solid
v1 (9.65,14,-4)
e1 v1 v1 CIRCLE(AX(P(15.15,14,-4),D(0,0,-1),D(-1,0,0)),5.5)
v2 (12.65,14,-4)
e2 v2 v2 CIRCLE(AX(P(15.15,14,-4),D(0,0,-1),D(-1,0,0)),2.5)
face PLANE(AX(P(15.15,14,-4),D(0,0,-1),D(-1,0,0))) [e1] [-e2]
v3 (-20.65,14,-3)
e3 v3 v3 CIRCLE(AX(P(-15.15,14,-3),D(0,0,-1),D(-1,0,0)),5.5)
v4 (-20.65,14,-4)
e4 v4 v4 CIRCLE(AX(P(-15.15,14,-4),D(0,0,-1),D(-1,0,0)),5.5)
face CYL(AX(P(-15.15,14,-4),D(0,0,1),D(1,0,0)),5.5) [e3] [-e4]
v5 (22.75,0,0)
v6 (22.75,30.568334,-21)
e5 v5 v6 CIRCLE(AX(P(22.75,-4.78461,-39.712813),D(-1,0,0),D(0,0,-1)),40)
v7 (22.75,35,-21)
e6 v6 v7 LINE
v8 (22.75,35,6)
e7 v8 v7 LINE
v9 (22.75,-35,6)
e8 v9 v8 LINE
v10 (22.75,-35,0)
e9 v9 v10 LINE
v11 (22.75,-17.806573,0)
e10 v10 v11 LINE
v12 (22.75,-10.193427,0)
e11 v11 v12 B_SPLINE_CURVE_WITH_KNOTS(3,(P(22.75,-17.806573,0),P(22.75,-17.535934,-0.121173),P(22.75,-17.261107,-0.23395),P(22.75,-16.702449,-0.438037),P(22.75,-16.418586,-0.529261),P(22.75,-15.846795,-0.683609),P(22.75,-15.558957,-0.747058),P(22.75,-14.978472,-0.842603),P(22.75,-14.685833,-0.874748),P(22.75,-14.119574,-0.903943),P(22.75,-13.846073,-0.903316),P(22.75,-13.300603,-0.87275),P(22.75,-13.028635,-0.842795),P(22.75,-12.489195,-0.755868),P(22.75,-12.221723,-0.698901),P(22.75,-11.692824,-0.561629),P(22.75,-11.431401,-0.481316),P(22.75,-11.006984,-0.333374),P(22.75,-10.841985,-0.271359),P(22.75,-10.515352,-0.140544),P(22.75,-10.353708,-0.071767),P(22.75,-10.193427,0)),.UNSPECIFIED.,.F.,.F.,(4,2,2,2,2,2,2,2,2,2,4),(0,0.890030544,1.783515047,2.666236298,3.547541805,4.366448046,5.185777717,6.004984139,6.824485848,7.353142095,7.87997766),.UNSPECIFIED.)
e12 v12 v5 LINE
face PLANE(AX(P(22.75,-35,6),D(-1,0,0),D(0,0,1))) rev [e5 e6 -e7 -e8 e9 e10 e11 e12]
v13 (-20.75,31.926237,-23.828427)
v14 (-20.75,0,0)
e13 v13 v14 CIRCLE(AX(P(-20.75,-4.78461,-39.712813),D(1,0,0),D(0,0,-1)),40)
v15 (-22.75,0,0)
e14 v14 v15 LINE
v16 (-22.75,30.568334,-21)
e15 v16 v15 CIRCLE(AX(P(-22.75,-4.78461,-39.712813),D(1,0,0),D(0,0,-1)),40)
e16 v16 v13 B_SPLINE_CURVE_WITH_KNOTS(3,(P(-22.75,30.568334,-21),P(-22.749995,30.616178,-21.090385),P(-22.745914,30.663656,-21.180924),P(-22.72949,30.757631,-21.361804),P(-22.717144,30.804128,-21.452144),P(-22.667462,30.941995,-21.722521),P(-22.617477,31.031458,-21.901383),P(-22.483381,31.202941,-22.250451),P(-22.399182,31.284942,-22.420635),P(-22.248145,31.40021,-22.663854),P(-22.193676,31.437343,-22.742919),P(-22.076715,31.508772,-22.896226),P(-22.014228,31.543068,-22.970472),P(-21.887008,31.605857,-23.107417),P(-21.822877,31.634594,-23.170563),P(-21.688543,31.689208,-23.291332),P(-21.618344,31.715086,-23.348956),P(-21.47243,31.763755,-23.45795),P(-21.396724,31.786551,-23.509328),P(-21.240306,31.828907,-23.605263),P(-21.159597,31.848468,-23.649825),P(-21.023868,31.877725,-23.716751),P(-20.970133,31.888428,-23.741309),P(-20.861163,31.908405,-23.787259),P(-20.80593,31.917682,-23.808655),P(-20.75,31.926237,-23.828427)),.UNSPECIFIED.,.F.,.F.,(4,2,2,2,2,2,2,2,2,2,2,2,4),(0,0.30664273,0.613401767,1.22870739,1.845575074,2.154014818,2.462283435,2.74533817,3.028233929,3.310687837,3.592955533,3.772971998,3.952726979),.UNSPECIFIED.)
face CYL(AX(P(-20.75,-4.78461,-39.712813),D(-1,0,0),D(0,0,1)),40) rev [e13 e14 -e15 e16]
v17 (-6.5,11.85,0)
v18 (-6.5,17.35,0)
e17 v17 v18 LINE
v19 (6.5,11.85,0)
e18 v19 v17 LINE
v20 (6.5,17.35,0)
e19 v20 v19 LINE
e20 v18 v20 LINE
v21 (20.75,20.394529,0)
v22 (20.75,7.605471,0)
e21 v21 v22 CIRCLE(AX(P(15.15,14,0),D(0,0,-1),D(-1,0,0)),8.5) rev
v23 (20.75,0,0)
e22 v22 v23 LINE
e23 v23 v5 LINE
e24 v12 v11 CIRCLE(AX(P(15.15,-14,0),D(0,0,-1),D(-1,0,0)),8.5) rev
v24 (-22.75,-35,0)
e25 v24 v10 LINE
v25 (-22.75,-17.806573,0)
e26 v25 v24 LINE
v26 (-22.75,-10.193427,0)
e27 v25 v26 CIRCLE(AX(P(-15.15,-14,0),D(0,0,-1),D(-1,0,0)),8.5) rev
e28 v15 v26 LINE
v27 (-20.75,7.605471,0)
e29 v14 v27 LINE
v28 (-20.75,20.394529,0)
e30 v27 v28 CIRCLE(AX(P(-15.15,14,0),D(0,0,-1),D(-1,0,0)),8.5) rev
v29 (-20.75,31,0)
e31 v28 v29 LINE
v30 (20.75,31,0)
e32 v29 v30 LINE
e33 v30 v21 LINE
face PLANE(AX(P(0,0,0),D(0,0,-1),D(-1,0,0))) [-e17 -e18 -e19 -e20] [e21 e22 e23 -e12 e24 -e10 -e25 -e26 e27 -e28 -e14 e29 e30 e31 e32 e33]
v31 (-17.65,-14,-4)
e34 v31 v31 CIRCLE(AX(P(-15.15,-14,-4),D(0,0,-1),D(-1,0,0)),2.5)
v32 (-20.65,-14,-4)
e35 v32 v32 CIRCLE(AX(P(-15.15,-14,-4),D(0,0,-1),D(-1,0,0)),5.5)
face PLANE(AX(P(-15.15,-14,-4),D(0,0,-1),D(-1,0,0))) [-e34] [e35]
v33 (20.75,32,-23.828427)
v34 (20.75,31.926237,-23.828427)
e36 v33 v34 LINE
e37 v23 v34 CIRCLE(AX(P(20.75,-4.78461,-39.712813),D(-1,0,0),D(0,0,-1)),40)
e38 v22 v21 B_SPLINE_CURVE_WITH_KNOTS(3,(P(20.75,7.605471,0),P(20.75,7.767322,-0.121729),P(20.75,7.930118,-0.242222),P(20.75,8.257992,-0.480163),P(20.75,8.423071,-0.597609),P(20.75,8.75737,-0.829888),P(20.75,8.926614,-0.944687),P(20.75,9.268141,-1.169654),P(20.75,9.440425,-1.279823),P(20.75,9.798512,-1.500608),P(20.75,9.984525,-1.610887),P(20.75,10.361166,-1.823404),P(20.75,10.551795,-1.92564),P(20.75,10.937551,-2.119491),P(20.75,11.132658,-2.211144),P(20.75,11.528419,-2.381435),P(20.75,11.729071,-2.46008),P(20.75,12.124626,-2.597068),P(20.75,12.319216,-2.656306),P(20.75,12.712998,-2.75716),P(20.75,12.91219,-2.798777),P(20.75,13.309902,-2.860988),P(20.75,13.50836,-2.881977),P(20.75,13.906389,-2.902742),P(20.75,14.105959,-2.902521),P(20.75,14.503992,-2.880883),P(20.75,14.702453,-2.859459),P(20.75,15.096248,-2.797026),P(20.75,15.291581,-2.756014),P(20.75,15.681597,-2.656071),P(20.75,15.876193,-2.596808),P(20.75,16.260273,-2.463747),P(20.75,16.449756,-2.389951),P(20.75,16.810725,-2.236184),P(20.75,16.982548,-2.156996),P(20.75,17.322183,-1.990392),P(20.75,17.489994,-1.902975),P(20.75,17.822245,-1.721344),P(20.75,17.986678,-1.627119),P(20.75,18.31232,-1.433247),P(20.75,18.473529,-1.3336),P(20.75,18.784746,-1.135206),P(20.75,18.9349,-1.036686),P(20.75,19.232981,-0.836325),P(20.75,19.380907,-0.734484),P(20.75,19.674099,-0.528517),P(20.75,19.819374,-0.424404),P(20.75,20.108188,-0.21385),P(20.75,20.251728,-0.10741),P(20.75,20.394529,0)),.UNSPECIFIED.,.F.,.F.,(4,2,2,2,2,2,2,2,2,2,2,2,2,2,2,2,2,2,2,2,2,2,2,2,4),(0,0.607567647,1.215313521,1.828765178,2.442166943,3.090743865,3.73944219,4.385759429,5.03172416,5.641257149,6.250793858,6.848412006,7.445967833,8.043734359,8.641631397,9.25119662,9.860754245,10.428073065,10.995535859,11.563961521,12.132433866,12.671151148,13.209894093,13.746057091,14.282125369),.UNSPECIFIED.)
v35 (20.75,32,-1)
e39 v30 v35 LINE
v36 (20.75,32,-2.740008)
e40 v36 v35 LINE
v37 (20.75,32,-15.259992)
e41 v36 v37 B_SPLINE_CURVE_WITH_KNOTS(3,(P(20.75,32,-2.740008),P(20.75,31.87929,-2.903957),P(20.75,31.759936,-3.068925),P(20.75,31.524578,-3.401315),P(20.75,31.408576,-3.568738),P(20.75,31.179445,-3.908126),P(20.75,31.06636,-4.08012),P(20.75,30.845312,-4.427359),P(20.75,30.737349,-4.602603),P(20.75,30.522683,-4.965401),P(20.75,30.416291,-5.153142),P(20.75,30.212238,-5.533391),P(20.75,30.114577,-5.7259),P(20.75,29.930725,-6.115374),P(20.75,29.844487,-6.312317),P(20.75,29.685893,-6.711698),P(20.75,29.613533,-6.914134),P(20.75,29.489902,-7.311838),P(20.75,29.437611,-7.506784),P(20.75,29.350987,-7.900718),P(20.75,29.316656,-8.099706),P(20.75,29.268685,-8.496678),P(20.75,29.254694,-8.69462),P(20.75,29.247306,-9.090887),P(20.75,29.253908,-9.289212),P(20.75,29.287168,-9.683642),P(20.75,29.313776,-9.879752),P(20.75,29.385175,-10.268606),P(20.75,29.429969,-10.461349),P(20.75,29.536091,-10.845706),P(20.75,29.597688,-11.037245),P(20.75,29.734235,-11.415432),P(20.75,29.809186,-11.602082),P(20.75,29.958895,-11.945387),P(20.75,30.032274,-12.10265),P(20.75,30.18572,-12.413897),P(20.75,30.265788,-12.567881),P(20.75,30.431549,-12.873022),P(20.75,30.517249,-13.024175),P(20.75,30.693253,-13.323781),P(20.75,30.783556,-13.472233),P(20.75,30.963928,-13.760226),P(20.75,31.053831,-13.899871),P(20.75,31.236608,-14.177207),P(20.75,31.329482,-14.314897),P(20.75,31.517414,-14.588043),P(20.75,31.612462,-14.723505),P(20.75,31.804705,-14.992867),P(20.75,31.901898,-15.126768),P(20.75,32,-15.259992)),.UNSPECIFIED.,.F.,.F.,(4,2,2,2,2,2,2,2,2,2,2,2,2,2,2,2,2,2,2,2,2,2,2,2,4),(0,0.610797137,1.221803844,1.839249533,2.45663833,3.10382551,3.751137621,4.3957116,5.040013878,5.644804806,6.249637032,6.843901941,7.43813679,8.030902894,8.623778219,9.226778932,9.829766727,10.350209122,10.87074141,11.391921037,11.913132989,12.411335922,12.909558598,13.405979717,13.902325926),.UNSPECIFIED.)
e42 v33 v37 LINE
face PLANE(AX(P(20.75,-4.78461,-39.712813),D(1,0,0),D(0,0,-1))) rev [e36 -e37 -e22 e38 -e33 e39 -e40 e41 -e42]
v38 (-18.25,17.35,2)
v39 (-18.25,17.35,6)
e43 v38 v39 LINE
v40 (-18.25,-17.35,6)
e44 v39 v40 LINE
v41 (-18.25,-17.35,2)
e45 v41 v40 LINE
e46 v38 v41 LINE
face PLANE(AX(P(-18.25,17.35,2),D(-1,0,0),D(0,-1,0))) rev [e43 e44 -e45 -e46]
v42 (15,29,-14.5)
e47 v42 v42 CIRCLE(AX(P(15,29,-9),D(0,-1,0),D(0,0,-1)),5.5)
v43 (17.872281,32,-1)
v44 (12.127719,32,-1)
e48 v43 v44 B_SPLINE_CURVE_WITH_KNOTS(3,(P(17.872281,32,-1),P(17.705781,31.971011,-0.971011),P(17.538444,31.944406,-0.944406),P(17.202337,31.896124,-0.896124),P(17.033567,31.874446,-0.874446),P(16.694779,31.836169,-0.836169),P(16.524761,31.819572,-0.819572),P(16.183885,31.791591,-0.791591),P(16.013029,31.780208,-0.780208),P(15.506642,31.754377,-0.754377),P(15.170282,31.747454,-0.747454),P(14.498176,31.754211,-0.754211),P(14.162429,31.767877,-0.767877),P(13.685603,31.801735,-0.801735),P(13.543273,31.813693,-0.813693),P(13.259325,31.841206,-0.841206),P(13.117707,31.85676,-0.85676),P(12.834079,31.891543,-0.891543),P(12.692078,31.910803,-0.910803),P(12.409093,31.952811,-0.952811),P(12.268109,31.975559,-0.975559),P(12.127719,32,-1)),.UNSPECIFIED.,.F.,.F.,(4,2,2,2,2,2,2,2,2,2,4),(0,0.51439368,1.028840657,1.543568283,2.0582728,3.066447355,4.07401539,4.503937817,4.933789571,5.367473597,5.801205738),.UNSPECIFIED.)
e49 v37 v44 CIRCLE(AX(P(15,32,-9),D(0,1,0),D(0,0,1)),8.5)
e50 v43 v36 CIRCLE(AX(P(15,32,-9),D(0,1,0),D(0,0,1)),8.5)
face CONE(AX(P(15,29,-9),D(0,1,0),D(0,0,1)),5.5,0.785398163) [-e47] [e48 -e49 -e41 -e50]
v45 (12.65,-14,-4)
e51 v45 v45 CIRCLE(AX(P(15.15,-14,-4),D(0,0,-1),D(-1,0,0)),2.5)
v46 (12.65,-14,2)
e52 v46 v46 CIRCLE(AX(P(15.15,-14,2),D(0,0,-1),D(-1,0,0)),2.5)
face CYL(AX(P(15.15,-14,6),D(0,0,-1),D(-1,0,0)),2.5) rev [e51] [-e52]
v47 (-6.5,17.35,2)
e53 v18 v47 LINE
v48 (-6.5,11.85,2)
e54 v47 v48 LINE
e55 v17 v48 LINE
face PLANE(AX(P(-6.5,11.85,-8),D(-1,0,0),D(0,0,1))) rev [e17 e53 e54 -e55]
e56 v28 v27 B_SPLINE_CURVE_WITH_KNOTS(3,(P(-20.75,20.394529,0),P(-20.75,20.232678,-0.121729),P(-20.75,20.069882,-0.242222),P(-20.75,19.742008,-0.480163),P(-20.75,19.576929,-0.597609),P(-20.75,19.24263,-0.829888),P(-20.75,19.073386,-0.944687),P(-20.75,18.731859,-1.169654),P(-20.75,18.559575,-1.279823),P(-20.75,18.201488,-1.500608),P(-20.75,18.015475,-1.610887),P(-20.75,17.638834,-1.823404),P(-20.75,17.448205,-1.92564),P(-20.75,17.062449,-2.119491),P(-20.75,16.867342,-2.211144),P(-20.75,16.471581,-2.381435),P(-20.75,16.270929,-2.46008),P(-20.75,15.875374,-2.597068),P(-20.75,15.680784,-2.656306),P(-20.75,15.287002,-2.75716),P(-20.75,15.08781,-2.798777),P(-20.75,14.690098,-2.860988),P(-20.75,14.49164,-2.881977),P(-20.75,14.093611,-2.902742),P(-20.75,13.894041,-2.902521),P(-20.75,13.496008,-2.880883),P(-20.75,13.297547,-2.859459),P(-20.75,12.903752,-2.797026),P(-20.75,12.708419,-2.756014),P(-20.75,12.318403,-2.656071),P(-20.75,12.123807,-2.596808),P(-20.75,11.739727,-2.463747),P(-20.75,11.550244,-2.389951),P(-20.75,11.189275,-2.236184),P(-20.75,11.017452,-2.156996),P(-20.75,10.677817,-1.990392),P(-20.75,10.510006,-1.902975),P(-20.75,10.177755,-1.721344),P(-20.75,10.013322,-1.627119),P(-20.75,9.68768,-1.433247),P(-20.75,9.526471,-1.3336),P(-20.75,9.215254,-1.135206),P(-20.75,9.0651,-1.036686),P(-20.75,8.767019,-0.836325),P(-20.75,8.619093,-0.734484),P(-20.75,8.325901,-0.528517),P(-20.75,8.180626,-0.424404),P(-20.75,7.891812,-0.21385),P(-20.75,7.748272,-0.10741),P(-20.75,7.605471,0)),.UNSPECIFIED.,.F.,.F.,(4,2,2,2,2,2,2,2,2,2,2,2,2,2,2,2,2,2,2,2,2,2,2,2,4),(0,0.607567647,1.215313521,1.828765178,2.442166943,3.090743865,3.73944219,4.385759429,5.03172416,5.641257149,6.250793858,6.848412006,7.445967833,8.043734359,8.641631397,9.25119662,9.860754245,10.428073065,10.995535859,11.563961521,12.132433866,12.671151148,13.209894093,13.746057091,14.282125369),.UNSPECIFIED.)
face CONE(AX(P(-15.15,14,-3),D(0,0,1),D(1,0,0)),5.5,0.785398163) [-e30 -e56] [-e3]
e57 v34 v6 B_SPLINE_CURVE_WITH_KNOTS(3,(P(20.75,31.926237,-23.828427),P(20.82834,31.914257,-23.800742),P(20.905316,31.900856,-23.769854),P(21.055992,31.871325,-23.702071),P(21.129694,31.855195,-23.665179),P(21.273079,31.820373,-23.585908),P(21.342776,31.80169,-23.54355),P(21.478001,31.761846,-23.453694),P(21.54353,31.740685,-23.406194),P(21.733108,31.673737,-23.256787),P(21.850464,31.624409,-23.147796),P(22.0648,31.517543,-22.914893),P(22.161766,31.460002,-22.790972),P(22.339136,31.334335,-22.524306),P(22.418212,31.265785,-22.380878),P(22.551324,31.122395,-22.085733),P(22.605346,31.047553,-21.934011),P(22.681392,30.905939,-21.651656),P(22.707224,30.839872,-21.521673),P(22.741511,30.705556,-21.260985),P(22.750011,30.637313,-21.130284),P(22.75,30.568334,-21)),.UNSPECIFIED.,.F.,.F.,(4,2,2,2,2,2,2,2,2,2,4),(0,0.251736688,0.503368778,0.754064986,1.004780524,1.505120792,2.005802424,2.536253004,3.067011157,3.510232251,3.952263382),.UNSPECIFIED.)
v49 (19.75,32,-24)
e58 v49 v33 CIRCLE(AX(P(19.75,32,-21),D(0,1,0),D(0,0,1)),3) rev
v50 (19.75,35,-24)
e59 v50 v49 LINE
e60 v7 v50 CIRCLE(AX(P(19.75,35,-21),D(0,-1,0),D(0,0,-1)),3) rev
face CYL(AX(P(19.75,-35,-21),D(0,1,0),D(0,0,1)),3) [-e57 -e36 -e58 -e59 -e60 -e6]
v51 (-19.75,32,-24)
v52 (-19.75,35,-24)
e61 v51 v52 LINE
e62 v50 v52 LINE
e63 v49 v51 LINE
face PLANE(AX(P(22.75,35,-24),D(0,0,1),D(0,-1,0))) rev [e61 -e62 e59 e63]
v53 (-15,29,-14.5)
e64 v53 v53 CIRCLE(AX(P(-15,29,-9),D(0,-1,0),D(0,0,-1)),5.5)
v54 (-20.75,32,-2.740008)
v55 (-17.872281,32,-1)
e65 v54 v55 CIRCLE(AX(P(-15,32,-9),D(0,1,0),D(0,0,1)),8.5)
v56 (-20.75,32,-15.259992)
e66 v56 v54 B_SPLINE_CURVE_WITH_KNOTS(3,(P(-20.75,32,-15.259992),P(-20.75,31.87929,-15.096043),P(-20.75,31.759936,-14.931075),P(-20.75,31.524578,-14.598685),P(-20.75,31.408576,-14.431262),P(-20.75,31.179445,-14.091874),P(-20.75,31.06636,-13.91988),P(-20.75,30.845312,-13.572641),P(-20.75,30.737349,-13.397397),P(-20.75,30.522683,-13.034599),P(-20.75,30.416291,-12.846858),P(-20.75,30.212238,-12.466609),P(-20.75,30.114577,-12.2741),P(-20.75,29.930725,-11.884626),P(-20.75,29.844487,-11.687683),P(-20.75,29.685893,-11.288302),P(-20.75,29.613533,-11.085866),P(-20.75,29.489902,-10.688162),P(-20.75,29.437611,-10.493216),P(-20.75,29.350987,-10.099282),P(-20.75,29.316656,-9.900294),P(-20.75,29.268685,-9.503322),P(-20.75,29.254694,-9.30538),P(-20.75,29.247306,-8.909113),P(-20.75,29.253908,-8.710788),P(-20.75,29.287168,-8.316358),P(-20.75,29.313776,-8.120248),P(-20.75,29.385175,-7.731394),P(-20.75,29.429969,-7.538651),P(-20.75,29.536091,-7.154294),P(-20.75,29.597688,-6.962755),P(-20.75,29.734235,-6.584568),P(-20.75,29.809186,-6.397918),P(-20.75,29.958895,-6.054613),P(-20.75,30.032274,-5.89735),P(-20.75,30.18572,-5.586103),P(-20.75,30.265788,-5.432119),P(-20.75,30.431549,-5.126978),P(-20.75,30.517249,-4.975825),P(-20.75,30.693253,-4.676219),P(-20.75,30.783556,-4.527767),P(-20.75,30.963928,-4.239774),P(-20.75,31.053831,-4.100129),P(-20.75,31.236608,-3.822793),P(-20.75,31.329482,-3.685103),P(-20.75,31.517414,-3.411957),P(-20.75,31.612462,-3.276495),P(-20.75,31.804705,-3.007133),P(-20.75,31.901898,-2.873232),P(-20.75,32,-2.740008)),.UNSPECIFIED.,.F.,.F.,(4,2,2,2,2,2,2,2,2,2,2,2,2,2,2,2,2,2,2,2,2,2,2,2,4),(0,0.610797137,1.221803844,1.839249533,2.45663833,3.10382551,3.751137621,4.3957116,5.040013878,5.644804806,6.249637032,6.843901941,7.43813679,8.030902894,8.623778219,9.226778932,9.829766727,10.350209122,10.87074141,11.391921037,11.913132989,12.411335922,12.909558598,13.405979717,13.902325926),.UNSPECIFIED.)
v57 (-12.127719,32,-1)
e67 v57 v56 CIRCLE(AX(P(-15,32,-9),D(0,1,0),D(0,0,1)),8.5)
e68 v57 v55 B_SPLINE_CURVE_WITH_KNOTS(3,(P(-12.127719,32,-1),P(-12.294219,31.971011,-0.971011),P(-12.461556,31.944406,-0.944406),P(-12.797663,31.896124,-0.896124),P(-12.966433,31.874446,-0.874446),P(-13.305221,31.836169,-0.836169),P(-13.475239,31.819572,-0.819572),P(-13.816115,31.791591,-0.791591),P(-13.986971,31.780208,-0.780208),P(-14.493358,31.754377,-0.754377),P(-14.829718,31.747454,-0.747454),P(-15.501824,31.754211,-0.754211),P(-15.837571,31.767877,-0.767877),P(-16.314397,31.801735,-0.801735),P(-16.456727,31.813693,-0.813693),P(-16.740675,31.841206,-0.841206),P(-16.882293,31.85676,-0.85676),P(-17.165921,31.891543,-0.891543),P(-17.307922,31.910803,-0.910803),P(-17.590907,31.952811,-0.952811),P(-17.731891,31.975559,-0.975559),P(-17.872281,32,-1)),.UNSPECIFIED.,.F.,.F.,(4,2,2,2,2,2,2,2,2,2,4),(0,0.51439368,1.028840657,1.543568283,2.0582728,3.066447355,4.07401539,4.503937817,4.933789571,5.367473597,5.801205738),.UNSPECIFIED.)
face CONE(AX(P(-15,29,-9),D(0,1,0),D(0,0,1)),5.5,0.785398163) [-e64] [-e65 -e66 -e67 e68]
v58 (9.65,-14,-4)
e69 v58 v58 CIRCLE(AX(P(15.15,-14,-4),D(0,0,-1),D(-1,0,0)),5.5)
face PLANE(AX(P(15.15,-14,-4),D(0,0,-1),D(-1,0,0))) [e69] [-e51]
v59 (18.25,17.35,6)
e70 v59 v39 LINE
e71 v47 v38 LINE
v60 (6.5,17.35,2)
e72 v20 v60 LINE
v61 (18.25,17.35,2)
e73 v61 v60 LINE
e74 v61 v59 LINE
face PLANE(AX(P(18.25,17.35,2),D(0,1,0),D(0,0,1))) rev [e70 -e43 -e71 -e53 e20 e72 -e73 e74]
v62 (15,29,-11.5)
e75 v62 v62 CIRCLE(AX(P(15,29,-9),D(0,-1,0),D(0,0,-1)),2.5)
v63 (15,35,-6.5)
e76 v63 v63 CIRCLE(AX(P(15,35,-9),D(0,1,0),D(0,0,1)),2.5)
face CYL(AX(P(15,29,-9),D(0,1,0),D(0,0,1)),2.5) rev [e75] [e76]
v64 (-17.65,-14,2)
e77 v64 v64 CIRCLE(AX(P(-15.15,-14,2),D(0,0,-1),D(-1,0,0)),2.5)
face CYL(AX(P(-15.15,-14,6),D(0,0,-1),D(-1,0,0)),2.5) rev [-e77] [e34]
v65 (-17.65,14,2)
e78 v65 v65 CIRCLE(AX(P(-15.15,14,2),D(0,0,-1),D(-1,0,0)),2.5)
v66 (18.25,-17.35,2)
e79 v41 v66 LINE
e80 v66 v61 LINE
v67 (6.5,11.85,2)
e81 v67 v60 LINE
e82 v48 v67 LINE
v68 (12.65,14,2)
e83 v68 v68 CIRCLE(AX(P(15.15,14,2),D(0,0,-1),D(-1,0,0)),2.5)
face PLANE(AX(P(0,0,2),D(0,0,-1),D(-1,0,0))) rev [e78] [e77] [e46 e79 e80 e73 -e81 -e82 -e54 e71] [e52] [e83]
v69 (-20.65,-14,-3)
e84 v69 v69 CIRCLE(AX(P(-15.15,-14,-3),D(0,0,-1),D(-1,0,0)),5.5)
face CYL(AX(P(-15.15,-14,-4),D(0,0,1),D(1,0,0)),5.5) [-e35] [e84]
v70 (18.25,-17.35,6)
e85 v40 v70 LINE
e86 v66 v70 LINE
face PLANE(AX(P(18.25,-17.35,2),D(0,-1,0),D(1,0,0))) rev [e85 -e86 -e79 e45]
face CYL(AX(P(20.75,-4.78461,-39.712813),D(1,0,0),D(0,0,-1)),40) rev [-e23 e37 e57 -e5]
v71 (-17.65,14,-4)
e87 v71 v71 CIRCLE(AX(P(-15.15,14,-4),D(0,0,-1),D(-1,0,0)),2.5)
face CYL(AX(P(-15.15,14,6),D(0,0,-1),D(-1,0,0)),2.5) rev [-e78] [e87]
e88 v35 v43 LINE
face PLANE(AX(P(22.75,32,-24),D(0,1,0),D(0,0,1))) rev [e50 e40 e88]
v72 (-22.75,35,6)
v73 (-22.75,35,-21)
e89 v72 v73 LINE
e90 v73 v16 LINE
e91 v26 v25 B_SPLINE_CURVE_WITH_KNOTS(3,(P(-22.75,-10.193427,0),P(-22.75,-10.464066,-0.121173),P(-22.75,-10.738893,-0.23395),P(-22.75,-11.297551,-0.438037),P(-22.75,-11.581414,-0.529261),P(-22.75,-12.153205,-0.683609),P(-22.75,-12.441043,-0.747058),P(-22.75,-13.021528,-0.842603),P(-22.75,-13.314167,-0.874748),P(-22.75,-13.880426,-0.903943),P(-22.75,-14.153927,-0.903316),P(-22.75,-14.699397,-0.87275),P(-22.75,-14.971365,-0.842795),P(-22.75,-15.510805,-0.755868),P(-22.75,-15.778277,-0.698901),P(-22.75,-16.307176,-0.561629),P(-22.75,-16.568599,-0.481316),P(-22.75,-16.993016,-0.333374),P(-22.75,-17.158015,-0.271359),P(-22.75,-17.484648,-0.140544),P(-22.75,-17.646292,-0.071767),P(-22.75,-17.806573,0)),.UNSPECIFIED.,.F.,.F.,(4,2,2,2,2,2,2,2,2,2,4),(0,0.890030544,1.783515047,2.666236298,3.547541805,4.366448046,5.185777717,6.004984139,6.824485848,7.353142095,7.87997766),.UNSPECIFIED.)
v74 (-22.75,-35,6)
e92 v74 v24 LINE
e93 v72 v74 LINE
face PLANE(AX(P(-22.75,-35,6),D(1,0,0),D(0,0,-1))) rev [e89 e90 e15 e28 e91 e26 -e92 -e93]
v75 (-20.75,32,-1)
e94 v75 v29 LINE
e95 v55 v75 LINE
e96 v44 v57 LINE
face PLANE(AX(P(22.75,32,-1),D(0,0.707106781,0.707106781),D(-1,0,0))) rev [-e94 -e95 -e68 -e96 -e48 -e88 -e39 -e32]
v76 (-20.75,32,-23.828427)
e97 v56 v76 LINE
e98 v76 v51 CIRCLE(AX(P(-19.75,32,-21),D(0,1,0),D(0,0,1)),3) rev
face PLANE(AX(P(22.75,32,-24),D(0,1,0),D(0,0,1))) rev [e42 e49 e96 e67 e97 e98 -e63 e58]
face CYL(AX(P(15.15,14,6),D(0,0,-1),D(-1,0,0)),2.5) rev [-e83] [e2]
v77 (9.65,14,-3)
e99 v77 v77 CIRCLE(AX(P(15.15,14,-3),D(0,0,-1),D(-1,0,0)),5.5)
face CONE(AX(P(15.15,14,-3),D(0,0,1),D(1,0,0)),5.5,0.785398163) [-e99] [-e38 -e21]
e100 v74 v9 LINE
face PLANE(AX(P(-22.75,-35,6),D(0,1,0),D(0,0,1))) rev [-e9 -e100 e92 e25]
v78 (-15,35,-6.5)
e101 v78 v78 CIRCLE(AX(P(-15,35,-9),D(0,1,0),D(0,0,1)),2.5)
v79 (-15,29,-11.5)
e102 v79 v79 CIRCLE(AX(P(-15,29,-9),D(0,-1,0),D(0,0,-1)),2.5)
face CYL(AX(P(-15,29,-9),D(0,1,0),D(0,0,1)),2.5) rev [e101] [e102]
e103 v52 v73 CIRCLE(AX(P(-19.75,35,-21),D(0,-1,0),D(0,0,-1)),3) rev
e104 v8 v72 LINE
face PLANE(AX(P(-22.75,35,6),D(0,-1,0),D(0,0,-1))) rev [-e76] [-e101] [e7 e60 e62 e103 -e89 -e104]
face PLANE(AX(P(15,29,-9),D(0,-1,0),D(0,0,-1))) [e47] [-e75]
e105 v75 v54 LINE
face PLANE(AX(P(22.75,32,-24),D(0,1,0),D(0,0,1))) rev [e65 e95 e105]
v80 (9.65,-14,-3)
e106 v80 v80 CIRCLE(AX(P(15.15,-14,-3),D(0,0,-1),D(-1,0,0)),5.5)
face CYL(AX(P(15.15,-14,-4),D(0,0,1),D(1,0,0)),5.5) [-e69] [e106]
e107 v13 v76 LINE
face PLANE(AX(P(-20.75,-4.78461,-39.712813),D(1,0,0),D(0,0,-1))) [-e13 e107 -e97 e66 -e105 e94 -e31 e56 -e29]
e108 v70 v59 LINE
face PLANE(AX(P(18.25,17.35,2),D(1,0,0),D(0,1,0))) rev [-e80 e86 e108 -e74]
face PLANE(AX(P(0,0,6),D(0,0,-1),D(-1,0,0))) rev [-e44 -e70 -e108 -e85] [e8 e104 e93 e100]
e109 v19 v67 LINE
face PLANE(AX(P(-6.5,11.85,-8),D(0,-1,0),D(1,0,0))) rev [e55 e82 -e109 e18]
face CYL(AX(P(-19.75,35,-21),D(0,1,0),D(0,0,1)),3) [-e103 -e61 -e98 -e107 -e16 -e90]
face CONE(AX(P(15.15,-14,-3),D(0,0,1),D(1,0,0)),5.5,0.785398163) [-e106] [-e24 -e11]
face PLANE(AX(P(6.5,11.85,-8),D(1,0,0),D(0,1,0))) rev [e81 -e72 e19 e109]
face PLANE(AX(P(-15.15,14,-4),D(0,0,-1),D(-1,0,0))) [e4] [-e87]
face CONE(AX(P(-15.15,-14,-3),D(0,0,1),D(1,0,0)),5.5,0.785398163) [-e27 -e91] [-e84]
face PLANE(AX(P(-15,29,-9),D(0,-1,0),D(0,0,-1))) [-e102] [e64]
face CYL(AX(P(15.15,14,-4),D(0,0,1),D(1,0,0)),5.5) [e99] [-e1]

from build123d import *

# Parameters (mm, degrees)
SKETCH1_W                = 45.5
SKETCH1_H                = 70
SKETCH1_R                = 2.5
BOSS_EXTRUDE1_DEPTH      = 6
SKETCH2_W                = 36.5
SKETCH2_H                = 34.7
CUT_EXTRUDE1_DEPTH       = 4
BOSS_EXTRUDE2_DEPTH      = 22.75
BOSS_EXTRUDE2_DEPTH_BACK = 22.75
SKETCH3_W                = 24
SKETCH3_H                = 3
BOSS_EXTRUDE3_DEPTH      = 2
BOSS_EXTRUDE4_START      = -2
BOSS_EXTRUDE4_DEPTH      = 2
SKETCH6_R                = 2.5
CUT_EXTRUDE2_DEPTH       = 6
FILLET1_R                = 3
SKETCH7_R                = 5.5
SKETCH7_R_2              = 2.5
BOSS_EXTRUDE5_DEPTH      = 3
BOSS_EXTRUDE6_START      = 4
SKETCH8_R                = 5.5
SKETCH8_R_2              = 2.5
BOSS_EXTRUDE6_DEPTH      = 4
CHAMFER1_SIZE            = 3
SKETCH10_W               = 13
SKETCH10_H               = 5.5
CUT_EXTRUDE3_DEPTH       = 10
CHAMFER3_SIZE            = 1


with BuildPart() as part:
    # Sketch1 → Boss-Extrude1 (new body)
    with BuildSketch(Plane.XY):
        Rectangle(SKETCH1_W, SKETCH1_H)
        with Locations((-15.15, 14)):
            Circle(SKETCH1_R, mode=Mode.SUBTRACT)
        with Locations((15.15, 14)):
            Circle(SKETCH1_R, mode=Mode.SUBTRACT)
        with Locations((15.15, -14)):
            Circle(SKETCH1_R, mode=Mode.SUBTRACT)
        with Locations((-15.15, -14)):
            Circle(SKETCH1_R, mode=Mode.SUBTRACT)
    extrude(amount=BOSS_EXTRUDE1_DEPTH)

    # Sketch2 → Cut-Extrude1 (cut)
    with BuildSketch(Plane.XY.offset(6)):
        Rectangle(SKETCH2_W, SKETCH2_H)
    extrude(amount=-CUT_EXTRUDE1_DEPTH, mode=Mode.SUBTRACT)

    # Sketch3 → Boss-Extrude2 (add, two sides: drawn at the far end of the back side and taken through both)
    with BuildSketch(Plane(origin=(0, 0, 0), x_dir=(0, 0, -1), z_dir=(1, 0, 0)).offset(-BOSS_EXTRUDE2_DEPTH_BACK)):
        with Locations((12, 33.5)):
            Rectangle(SKETCH3_W, SKETCH3_H)
    extrude(amount=BOSS_EXTRUDE2_DEPTH + BOSS_EXTRUDE2_DEPTH_BACK)

    # Sketch4 → Boss-Extrude3 (add)
    with BuildSketch(Plane.ZY.offset(22.75)):
        with BuildLine():
            Line((-24, 32), (0, 32))
            Line((0, 32), (0, 0))
            ThreePointArc((0, 0), (-7.712812921, 19.215390309), (-24, 32))
        make_face()
    extrude(amount=-BOSS_EXTRUDE3_DEPTH)

    # Sketch5 → Boss-Extrude4 (add)
    with BuildSketch(Plane(origin=(22.75, 0, 0), x_dir=(0, 0, -1), z_dir=(1, 0, 0)).offset(BOSS_EXTRUDE4_START)):
        with BuildLine():
            Line((24, 32), (0, 32))
            Line((0, 32), (0, 0))
            ThreePointArc((0, 0), (7.712812921, 19.215390309), (24, 32))
        make_face()
    extrude(amount=BOSS_EXTRUDE4_DEPTH)

    # Sketch6 → Cut-Extrude2 (cut)
    with BuildSketch(Plane(origin=(0, 35, 0), x_dir=(1, 0, 0), z_dir=(0, 1, 0))):
        with Locations(Location((-15, 9, 0), (0, 0, 270))):
            Circle(SKETCH6_R)
        with Locations(Location((15, 9, 0), (0, 0, 270))):
            Circle(SKETCH6_R)
    extrude(amount=-CUT_EXTRUDE2_DEPTH, mode=Mode.SUBTRACT)

    # Fillet1
    # the kernel refuses this fillet: 3 mm, written as the material it takes off along each edge
    with BuildSketch(Plane(origin=(-22.75, 42.5, -24), x_dir=(0, 0, 1), z_dir=(0, -1, 0))) as fillet1_piece_1:
        with BuildLine():
            CenterArc((FILLET1_R, -FILLET1_R), FILLET1_R, 90, 90)
            Line((0, -FILLET1_R), (0, 0))
            Line((0, 0), (FILLET1_R, 0))
        make_face()
    extrude(amount=18, mode=Mode.SUBTRACT)
    with BuildSketch(Plane(origin=(22.75, 42.5, -24), x_dir=(0, 0, 1), z_dir=(0, -1, 0))) as fillet1_piece_2:
        with BuildLine():
            CenterArc((FILLET1_R, FILLET1_R), FILLET1_R, 180, 90)
            Line((0, FILLET1_R), (0, 0))
            Line((0, 0), (FILLET1_R, 0))
        make_face()
    extrude(amount=18, mode=Mode.SUBTRACT)

    # Sketch7 → Boss-Extrude5 (add)
    # profile 1 of 2: a face of its own
    with BuildSketch(Plane.XZ.offset(-32)):
        with Locations(Location((-15, -9, 0), (0, 0, 90))):
            Circle(SKETCH7_R)
        with Locations(Location((-15, -9, 0), (0, 0, 90))):
            Circle(SKETCH7_R_2, mode=Mode.SUBTRACT)
    # profile 2 of 2: a face of its own
    with BuildSketch(Plane.XZ.offset(-32)):
        with Locations(Location((15, -9, 0), (0, 0, 90))):
            Circle(SKETCH7_R)
        with Locations(Location((15, -9, 0), (0, 0, 90))):
            Circle(SKETCH7_R_2, mode=Mode.SUBTRACT)
    extrude(amount=BOSS_EXTRUDE5_DEPTH)

    # Sketch8 → Boss-Extrude6 (add)
    # profile 1 of 4: a face of its own
    with BuildSketch(Plane(origin=(0, 0, 0), x_dir=(-1, 0, 0), z_dir=(0, 0, -1)).offset(BOSS_EXTRUDE6_START)):
        with Locations((-15.15, 14)):
            Circle(SKETCH8_R)
        with Locations((-15.15, 14)):
            Circle(SKETCH8_R_2, mode=Mode.SUBTRACT)
    # profile 2 of 4: a face of its own
    with BuildSketch(Plane(origin=(0, 0, 0), x_dir=(-1, 0, 0), z_dir=(0, 0, -1)).offset(BOSS_EXTRUDE6_START)):
        with Locations((15.15, 14)):
            Circle(SKETCH8_R)
        with Locations((15.15, 14)):
            Circle(SKETCH8_R_2, mode=Mode.SUBTRACT)
    # profile 3 of 4: a face of its own
    with BuildSketch(Plane(origin=(0, 0, 0), x_dir=(-1, 0, 0), z_dir=(0, 0, -1)).offset(BOSS_EXTRUDE6_START)):
        with Locations((15.15, -14)):
            Circle(SKETCH8_R)
        with Locations((15.15, -14)):
            Circle(SKETCH8_R_2, mode=Mode.SUBTRACT)
    # profile 4 of 4: a face of its own
    with BuildSketch(Plane(origin=(0, 0, 0), x_dir=(-1, 0, 0), z_dir=(0, 0, -1)).offset(BOSS_EXTRUDE6_START)):
        with Locations((-15.15, -14)):
            Circle(SKETCH8_R)
        with Locations((-15.15, -14)):
            Circle(SKETCH8_R_2, mode=Mode.SUBTRACT)
    extrude(amount=-BOSS_EXTRUDE6_DEPTH)

    # Chamfer1
    # the kernel refuses this chamfer: 3 mm, written as the material it adds along each edge
    with BuildSketch(Plane(origin=(15, 32, -9), x_dir=(0, 0, 1), z_dir=(1, 0, 0))) as chamfer1_piece_1_section:
        Polygon((5.5 + CHAMFER1_SIZE, 0), (5.5, CHAMFER1_SIZE), (5.5, 0), align=None)
    chamfer1_piece_1 = revolve(axis=Axis((15, 32, -9), (0, -1, 0)), mode=Mode.PRIVATE)
    chamfer1_piece_1 = split(chamfer1_piece_1, bisect_by=Plane(origin=(20.75, 30.538271309, -15.961728691), z_dir=(-1, 0, 0)), keep=Keep.TOP, mode=Mode.PRIVATE)
    add(chamfer1_piece_1)
    with BuildSketch(Plane(origin=(-15, 32, -9), x_dir=(0, 0, 1), z_dir=(1, 0, 0))) as chamfer1_piece_2_section:
        Polygon((5.5 + CHAMFER1_SIZE, 0), (5.5, CHAMFER1_SIZE), (5.5, 0), align=None)
    chamfer1_piece_2 = revolve(axis=Axis((-15, 32, -9), (0, -1, 0)), mode=Mode.PRIVATE)
    chamfer1_piece_2 = split(chamfer1_piece_2, bisect_by=Plane(origin=(-20.75, 30.538271309, -15.961728691), z_dir=(1, 0, 0)), keep=Keep.TOP, mode=Mode.PRIVATE)
    add(chamfer1_piece_2)
    with BuildSketch(Plane(origin=(15.15, -14, 0), x_dir=(-1, 0, 0), z_dir=(0, -1, 0))) as chamfer1_piece_3_section:
        Polygon((5.5 + CHAMFER1_SIZE, 0), (5.5, CHAMFER1_SIZE), (5.5, 0), align=None)
    chamfer1_piece_3 = revolve(axis=Axis((15.15, -14, 0), (0, 0, -1)), mode=Mode.PRIVATE)
    chamfer1_piece_3 = split(chamfer1_piece_3, bisect_by=Plane(origin=(22.75, -14, -1.459917712), z_dir=(-1, 0, 0)), keep=Keep.TOP, mode=Mode.PRIVATE)
    add(chamfer1_piece_3)
    with BuildSketch(Plane(origin=(-15.15, -14, 0), x_dir=(-1, 0, 0), z_dir=(0, -1, 0))) as chamfer1_piece_4_section:
        Polygon((5.5 + CHAMFER1_SIZE, 0), (5.5, CHAMFER1_SIZE), (5.5, 0), align=None)
    chamfer1_piece_4 = revolve(axis=Axis((-15.15, -14, 0), (0, 0, -1)), mode=Mode.PRIVATE)
    chamfer1_piece_4 = split(chamfer1_piece_4, bisect_by=Plane(origin=(-22.75, -14, -1.459917712), z_dir=(1, 0, 0)), keep=Keep.TOP, mode=Mode.PRIVATE)
    add(chamfer1_piece_4)
    with BuildSketch(Plane(origin=(-15.15, 14, 0), x_dir=(-1, 0, 0), z_dir=(0, -1, 0))) as chamfer1_piece_5_section:
        Polygon((5.5 + CHAMFER1_SIZE, 0), (5.5, CHAMFER1_SIZE), (5.5, 0), align=None)
    chamfer1_piece_5 = revolve(axis=Axis((-15.15, 14, 0), (0, 0, -1)), mode=Mode.PRIVATE)
    chamfer1_piece_5 = split(chamfer1_piece_5, bisect_by=Plane(origin=(-20.75, 14, -1.462006574), z_dir=(1, 0, 0)), keep=Keep.TOP, mode=Mode.PRIVATE)
    add(chamfer1_piece_5)
    with BuildSketch(Plane(origin=(15.15, 14, 0), x_dir=(-1, 0, 0), z_dir=(0, -1, 0))) as chamfer1_piece_6_section:
        Polygon((5.5 + CHAMFER1_SIZE, 0), (5.5, CHAMFER1_SIZE), (5.5, 0), align=None)
    chamfer1_piece_6 = revolve(axis=Axis((15.15, 14, 0), (0, 0, -1)), mode=Mode.PRIVATE)
    chamfer1_piece_6 = split(chamfer1_piece_6, bisect_by=Plane(origin=(20.75, 20.895299958, -0.462006574), z_dir=(-1, 0, 0)), keep=Keep.TOP, mode=Mode.PRIVATE)
    add(chamfer1_piece_6)

    # Sketch10 → Cut-Extrude3 (cut)
    with BuildSketch(Plane.XY.offset(2)):
        with Locations((0, 14.6)):
            Rectangle(SKETCH10_W, SKETCH10_H)
    extrude(amount=-CUT_EXTRUDE3_DEPTH, mode=Mode.SUBTRACT)

    # Chamfer3
    # the kernel refuses this chamfer: 1 mm, written as the material it adds along each edge
    with BuildSketch(Plane(origin=(-20.75, 32, 0), x_dir=(0, -0.9996219169112968, 0.02749587661058639), z_dir=(1, 0, 0))) as chamfer3_piece_1_section:
        Polygon((CHAMFER3_SIZE * 0.999621916911, CHAMFER3_SIZE * 0.0274958766106), (-CHAMFER3_SIZE * 0.0274958766106, CHAMFER3_SIZE * 0.999621916911), (0, 0), align=None)
    chamfer3_piece_1 = extrude(amount=44.071682988, mode=Mode.PRIVATE)
    chamfer3_piece_1 = split(chamfer3_piece_1, bisect_by=Plane(origin=(22.75, 31.661719014, -0.324794748), z_dir=(-1, 0, 0)), keep=Keep.TOP, mode=Mode.PRIVATE)
    add(chamfer3_piece_1)


solid = part.part
